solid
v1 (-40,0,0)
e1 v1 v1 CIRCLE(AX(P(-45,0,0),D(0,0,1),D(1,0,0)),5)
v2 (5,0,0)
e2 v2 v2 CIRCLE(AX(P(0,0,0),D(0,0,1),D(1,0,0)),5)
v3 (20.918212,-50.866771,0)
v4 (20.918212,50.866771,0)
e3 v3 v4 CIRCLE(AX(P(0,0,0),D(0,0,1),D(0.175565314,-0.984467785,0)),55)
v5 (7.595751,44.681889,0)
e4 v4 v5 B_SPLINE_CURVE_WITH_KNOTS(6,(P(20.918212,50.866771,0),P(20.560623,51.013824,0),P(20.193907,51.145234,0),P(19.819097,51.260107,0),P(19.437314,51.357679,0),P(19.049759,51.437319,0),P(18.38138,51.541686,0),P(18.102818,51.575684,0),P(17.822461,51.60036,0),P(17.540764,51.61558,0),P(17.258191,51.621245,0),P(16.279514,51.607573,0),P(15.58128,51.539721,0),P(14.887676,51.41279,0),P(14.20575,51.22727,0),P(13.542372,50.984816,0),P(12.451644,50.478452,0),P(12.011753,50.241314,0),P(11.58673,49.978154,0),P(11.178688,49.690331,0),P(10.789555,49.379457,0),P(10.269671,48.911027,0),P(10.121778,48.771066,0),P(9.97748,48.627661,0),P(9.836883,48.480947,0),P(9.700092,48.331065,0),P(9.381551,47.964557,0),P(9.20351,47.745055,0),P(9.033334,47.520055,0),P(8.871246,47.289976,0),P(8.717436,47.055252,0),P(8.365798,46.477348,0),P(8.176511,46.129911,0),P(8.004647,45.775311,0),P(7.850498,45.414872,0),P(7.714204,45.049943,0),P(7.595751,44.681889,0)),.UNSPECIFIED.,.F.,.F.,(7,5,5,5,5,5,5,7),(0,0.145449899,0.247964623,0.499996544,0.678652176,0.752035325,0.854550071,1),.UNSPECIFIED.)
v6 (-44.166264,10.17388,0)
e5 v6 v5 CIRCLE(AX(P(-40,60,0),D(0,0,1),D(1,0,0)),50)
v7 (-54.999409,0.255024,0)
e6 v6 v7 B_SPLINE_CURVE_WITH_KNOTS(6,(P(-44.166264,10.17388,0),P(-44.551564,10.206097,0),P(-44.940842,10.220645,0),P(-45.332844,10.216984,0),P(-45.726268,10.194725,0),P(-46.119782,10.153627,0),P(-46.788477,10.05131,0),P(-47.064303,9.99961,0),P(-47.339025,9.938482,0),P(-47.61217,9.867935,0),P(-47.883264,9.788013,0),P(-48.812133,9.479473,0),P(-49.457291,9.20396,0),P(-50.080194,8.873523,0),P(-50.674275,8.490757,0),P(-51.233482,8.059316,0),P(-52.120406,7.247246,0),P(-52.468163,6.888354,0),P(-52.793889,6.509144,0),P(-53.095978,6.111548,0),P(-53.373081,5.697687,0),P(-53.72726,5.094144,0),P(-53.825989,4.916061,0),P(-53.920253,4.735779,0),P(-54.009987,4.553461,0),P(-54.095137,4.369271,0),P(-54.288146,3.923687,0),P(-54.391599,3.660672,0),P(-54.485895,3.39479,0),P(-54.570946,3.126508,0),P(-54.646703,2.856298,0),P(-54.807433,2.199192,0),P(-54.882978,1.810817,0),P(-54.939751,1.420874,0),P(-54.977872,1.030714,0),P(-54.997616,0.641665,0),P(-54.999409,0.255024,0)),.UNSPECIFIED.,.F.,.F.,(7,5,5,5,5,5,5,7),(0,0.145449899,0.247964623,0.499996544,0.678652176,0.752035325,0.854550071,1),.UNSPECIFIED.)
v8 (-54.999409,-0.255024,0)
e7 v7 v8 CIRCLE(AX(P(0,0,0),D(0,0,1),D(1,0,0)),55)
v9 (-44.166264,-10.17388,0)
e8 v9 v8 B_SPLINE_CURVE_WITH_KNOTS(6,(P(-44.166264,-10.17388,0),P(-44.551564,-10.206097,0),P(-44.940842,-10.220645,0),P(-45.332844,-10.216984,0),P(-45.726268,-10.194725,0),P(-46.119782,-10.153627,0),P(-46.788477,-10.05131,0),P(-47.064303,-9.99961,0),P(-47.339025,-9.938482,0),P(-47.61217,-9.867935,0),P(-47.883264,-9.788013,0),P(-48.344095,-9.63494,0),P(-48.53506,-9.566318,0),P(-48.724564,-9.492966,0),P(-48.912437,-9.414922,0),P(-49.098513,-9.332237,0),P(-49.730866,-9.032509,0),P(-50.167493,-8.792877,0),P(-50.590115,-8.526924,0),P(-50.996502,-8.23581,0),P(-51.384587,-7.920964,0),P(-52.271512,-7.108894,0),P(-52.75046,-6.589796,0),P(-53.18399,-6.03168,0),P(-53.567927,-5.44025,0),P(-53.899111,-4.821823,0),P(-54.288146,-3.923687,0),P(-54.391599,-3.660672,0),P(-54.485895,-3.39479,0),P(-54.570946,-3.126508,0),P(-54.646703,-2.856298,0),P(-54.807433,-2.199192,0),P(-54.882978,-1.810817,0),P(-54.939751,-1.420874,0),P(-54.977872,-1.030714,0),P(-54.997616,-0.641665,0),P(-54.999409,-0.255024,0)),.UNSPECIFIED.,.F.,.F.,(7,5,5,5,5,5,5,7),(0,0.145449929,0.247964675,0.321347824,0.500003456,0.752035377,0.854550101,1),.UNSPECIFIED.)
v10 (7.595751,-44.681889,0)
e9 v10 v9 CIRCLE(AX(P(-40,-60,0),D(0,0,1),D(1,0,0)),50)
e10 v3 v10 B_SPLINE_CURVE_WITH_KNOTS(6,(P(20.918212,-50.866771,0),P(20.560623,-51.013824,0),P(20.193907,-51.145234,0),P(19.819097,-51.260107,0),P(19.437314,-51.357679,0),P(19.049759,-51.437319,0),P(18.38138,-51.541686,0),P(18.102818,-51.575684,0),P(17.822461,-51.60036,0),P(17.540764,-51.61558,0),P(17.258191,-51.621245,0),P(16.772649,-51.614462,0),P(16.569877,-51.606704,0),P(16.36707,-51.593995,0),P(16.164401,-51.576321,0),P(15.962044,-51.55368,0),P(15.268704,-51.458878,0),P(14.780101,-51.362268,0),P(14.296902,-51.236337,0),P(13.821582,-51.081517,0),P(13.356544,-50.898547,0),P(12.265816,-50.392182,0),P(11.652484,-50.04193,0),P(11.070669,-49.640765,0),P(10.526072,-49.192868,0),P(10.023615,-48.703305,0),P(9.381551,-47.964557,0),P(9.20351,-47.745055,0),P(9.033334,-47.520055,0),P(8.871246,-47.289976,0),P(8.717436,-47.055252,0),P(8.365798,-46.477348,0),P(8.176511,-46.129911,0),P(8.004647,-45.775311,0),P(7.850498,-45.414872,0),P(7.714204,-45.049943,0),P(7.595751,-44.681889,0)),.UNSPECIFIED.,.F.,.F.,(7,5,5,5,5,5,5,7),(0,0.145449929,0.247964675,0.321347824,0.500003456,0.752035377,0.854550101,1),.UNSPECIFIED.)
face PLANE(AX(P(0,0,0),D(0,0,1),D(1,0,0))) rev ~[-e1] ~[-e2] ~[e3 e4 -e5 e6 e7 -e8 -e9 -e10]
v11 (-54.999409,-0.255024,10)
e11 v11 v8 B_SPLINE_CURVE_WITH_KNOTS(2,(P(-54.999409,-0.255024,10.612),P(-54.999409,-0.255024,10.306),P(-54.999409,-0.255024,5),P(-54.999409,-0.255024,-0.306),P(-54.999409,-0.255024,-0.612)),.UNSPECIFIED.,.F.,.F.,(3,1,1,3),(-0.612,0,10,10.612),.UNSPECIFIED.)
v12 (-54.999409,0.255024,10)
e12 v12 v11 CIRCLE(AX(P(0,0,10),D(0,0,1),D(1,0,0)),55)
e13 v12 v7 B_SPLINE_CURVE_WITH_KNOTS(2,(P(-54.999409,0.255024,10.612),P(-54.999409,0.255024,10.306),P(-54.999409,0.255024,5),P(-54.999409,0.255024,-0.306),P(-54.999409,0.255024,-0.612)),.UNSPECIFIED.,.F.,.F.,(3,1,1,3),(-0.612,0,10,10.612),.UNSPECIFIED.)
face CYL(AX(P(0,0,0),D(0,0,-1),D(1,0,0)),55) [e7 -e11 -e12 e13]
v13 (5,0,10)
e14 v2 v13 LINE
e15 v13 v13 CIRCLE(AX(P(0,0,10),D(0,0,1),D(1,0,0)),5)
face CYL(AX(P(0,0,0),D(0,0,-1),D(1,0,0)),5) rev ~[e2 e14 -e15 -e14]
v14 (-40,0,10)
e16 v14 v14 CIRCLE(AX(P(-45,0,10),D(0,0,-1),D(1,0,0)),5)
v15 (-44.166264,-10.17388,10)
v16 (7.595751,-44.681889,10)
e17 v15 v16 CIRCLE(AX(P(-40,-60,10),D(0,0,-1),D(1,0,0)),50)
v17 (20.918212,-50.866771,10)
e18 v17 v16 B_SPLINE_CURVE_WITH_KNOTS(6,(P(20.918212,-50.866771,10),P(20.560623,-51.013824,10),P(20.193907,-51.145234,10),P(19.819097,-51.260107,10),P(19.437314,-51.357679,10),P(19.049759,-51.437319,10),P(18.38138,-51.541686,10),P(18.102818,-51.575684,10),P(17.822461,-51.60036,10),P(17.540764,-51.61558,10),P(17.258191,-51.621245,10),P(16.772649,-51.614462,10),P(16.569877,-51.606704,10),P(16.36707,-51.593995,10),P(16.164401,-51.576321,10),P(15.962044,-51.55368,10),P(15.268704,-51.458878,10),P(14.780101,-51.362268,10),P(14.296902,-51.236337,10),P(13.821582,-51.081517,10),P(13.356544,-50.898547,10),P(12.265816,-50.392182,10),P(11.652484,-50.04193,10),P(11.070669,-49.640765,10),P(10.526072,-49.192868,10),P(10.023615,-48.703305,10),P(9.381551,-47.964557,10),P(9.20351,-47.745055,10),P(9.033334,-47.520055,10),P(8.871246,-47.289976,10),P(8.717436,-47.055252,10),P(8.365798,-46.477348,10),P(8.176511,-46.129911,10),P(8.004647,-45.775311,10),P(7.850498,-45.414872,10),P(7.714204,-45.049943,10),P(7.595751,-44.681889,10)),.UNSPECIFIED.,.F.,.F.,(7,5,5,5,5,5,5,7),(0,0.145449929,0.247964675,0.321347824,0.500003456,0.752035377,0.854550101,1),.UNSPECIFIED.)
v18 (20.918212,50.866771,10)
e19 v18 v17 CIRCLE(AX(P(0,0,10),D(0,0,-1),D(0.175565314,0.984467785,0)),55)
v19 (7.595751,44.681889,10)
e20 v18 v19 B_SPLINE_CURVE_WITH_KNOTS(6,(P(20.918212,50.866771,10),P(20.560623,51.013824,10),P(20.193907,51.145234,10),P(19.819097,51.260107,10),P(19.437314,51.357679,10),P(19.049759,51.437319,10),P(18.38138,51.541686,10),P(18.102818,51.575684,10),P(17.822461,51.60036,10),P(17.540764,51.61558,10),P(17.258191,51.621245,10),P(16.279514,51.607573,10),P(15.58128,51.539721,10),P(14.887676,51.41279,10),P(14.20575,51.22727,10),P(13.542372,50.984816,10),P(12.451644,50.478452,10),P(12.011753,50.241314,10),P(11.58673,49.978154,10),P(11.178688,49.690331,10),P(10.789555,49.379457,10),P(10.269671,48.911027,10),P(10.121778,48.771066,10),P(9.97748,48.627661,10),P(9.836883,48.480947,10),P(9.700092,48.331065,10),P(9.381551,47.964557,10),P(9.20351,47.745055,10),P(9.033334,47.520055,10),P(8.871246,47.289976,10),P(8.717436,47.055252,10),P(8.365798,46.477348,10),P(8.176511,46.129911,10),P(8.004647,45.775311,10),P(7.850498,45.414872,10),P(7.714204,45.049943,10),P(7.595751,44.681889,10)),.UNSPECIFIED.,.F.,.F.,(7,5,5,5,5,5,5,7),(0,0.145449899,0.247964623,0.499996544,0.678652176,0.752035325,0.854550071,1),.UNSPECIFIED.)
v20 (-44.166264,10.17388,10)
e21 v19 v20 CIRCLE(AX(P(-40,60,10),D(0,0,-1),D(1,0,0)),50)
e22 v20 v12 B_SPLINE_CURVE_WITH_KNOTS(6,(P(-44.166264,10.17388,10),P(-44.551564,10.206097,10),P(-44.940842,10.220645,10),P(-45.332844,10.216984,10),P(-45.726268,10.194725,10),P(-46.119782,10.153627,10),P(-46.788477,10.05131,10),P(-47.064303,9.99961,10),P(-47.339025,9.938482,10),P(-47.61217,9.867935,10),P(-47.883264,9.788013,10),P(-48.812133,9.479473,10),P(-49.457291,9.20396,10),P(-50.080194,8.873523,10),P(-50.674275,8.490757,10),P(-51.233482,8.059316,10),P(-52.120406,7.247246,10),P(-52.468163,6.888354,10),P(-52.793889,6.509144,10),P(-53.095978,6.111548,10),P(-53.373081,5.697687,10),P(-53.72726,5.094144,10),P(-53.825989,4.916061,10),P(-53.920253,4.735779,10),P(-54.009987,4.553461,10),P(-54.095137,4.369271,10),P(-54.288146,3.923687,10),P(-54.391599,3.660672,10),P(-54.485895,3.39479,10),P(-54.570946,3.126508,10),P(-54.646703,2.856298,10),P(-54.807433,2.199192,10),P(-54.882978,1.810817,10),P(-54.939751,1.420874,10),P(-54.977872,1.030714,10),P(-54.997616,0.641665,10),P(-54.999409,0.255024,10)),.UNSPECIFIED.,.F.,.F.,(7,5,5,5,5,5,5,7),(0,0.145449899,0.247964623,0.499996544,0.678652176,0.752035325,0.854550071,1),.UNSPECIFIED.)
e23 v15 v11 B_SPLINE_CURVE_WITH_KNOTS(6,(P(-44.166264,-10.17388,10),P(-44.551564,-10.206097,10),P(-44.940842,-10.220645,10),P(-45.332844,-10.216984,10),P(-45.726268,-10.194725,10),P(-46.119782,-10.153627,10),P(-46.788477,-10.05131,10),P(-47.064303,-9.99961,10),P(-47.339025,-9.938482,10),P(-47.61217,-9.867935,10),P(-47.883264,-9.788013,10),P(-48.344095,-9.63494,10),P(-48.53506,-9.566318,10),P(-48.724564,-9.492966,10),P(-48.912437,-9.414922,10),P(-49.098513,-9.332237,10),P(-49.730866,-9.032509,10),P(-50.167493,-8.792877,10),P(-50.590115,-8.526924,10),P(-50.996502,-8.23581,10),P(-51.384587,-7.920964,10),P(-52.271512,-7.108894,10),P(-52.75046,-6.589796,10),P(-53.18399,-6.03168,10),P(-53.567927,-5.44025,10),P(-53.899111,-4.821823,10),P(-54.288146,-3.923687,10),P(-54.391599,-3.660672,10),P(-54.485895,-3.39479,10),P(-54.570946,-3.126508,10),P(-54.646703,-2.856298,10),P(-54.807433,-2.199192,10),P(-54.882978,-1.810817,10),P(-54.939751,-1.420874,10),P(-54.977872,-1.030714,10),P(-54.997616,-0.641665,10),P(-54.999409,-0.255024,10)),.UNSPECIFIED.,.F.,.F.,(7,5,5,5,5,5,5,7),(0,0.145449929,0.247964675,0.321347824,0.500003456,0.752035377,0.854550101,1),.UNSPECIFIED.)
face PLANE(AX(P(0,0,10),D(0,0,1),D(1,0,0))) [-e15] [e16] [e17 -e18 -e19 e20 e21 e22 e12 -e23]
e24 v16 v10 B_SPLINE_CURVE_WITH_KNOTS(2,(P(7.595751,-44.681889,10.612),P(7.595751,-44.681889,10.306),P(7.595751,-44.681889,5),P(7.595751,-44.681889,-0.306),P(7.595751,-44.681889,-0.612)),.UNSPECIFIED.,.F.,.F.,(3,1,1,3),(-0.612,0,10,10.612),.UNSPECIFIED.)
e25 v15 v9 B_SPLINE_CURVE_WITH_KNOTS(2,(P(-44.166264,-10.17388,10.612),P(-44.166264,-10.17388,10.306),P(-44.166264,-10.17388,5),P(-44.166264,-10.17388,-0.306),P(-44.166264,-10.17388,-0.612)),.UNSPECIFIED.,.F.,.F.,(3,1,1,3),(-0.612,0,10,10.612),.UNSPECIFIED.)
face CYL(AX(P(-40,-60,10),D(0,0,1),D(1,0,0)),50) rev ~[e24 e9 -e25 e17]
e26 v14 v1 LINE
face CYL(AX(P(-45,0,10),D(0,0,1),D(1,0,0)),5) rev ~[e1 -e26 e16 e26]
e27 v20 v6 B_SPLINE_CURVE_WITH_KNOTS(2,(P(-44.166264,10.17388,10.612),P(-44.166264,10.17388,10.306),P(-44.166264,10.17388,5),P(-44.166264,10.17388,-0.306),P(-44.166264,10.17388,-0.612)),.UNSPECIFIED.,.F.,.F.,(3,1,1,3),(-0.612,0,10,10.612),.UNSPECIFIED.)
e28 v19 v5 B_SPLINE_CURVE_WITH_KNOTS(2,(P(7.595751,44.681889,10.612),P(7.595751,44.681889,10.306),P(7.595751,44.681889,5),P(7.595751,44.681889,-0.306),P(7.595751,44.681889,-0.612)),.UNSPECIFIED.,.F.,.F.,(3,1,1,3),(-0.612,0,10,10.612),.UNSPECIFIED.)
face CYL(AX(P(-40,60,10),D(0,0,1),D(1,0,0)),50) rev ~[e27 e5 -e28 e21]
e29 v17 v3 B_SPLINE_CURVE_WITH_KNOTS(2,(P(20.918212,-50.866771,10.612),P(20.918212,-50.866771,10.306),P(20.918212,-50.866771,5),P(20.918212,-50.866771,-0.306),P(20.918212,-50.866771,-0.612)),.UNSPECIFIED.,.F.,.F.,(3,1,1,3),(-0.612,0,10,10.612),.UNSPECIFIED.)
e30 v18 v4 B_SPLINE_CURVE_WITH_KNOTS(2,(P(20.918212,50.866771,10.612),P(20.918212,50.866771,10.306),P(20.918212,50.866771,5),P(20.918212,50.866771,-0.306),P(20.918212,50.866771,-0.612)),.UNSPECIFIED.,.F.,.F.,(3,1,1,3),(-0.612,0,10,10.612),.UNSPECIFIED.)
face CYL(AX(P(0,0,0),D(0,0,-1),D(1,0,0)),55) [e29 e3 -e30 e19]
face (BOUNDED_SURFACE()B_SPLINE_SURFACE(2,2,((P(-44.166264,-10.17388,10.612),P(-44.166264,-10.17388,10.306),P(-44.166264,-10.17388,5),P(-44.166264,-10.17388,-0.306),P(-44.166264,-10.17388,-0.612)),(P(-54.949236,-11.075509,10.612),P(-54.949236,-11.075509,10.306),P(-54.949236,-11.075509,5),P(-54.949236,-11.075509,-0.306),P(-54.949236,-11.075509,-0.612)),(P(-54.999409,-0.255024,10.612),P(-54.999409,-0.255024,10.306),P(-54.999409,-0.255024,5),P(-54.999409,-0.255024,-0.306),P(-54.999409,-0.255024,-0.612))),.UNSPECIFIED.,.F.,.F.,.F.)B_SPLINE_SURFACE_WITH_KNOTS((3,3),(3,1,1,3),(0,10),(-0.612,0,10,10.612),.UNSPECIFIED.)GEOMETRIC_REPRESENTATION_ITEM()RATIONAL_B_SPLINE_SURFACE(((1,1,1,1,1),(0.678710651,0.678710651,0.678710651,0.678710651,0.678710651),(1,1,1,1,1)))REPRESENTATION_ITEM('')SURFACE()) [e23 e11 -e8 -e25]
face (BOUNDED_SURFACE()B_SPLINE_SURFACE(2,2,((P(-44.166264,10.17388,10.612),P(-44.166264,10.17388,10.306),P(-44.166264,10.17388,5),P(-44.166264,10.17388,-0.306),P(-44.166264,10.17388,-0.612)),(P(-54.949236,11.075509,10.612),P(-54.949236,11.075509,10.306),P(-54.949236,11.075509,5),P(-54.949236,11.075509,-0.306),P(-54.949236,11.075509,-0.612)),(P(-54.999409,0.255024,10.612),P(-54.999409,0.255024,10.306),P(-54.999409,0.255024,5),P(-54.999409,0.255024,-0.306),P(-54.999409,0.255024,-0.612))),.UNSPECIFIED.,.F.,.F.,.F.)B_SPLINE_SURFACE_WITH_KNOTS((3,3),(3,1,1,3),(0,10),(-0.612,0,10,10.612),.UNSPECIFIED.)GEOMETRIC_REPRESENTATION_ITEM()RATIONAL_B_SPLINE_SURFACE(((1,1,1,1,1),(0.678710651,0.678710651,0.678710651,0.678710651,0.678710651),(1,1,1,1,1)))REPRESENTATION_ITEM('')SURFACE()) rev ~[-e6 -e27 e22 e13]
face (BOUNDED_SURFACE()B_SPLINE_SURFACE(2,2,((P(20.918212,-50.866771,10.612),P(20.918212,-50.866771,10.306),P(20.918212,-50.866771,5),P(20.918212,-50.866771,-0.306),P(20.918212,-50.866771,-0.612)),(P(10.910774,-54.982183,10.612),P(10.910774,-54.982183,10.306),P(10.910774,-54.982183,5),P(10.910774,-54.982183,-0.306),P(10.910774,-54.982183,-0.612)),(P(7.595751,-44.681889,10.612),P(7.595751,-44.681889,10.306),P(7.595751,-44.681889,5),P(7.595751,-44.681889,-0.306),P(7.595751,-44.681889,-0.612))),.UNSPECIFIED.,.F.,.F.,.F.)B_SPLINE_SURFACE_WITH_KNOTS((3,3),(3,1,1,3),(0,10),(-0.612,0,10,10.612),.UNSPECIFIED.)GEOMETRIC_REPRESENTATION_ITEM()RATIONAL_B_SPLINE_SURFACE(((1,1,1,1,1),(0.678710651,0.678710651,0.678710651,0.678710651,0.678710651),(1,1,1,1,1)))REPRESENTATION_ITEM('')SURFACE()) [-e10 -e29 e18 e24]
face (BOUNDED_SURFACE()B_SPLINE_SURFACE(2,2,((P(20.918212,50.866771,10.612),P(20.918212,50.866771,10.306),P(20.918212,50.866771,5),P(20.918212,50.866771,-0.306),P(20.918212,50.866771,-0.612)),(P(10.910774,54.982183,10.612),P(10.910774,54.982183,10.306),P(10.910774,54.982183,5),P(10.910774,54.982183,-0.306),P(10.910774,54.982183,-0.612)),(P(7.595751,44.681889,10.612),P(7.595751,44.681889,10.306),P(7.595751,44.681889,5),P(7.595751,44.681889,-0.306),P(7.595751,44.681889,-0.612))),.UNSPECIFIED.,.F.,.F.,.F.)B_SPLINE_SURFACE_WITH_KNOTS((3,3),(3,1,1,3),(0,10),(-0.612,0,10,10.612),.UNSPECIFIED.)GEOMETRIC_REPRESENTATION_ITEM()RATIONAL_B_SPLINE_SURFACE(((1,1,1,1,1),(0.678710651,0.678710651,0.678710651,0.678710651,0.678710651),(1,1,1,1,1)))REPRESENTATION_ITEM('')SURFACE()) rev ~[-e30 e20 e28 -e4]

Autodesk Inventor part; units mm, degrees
ref_plane "YZ Plane" through (0, 0, 0) normal (1, 0, 0) x (0, 1, 0)
ref_plane "XZ Plane" through (0, 0, 0) normal (0, 1, 0) x (-1, 0, 0)
ref_plane "XY Plane" through (0, 0, 0) normal (0, 0, 1) x (1, 0, 0)
sketch "Эскиз1" plane through (0, 0, 0) normal (0, 0, 1) x (1, 0, 0)
  circle A0 centre (0, 0) radius 5
  circle A1 centre (0, 0) radius 55
  dimension "d0" = 10
  dimension "d1" = 110
extrude "Выдавливание1" add sketch "Эскиз1" along normal blind 10
sketch "Эскиз2" plane through (0, 0, 10) normal (0, 0, 1) x (1, 0, 0)
  circle A0 centre (-40, 60) radius 50
  line L0 (0, -92.4934) -> (0, 92.4934) projected
  line L1 (-90.2801, 0) -> (79.2133, 0) projected
  circle A1 centre (-40, -60) radius 50
  point P0 (0, 0)
  dimension "d4" = 60
  dimension "d5" = 40
  dimension "d14" = 100
extrude "Выдавливание2" cut sketch "Эскиз2" against normal through all
fillet "Сопряжение1" radius 10 4 edges at (9.6561, 54.1457, 5) (-53.6946, 11.912, 5) (9.6561, -54.1457, 5) (-53.6946, -11.912, 5)
fillet_without_effect "Сопряжение2"
sketch "Эскиз3" plane through (0, 0, 10) normal (0, 0, 1) x (1, 0, 0)
  circle A0 centre (0, 0) radius 5 projected
  line L0 (-77, 0) -> (77, 0) projected
  circle A1 centre (-45, 0) radius 5
  dimension "d10" = 10
  dimension "d11" = 45
extrude "Выдавливание3" cut sketch "Эскиз3" against normal through all contours A1 L0 | L0 A1
properties part number "кривошип_v3"
